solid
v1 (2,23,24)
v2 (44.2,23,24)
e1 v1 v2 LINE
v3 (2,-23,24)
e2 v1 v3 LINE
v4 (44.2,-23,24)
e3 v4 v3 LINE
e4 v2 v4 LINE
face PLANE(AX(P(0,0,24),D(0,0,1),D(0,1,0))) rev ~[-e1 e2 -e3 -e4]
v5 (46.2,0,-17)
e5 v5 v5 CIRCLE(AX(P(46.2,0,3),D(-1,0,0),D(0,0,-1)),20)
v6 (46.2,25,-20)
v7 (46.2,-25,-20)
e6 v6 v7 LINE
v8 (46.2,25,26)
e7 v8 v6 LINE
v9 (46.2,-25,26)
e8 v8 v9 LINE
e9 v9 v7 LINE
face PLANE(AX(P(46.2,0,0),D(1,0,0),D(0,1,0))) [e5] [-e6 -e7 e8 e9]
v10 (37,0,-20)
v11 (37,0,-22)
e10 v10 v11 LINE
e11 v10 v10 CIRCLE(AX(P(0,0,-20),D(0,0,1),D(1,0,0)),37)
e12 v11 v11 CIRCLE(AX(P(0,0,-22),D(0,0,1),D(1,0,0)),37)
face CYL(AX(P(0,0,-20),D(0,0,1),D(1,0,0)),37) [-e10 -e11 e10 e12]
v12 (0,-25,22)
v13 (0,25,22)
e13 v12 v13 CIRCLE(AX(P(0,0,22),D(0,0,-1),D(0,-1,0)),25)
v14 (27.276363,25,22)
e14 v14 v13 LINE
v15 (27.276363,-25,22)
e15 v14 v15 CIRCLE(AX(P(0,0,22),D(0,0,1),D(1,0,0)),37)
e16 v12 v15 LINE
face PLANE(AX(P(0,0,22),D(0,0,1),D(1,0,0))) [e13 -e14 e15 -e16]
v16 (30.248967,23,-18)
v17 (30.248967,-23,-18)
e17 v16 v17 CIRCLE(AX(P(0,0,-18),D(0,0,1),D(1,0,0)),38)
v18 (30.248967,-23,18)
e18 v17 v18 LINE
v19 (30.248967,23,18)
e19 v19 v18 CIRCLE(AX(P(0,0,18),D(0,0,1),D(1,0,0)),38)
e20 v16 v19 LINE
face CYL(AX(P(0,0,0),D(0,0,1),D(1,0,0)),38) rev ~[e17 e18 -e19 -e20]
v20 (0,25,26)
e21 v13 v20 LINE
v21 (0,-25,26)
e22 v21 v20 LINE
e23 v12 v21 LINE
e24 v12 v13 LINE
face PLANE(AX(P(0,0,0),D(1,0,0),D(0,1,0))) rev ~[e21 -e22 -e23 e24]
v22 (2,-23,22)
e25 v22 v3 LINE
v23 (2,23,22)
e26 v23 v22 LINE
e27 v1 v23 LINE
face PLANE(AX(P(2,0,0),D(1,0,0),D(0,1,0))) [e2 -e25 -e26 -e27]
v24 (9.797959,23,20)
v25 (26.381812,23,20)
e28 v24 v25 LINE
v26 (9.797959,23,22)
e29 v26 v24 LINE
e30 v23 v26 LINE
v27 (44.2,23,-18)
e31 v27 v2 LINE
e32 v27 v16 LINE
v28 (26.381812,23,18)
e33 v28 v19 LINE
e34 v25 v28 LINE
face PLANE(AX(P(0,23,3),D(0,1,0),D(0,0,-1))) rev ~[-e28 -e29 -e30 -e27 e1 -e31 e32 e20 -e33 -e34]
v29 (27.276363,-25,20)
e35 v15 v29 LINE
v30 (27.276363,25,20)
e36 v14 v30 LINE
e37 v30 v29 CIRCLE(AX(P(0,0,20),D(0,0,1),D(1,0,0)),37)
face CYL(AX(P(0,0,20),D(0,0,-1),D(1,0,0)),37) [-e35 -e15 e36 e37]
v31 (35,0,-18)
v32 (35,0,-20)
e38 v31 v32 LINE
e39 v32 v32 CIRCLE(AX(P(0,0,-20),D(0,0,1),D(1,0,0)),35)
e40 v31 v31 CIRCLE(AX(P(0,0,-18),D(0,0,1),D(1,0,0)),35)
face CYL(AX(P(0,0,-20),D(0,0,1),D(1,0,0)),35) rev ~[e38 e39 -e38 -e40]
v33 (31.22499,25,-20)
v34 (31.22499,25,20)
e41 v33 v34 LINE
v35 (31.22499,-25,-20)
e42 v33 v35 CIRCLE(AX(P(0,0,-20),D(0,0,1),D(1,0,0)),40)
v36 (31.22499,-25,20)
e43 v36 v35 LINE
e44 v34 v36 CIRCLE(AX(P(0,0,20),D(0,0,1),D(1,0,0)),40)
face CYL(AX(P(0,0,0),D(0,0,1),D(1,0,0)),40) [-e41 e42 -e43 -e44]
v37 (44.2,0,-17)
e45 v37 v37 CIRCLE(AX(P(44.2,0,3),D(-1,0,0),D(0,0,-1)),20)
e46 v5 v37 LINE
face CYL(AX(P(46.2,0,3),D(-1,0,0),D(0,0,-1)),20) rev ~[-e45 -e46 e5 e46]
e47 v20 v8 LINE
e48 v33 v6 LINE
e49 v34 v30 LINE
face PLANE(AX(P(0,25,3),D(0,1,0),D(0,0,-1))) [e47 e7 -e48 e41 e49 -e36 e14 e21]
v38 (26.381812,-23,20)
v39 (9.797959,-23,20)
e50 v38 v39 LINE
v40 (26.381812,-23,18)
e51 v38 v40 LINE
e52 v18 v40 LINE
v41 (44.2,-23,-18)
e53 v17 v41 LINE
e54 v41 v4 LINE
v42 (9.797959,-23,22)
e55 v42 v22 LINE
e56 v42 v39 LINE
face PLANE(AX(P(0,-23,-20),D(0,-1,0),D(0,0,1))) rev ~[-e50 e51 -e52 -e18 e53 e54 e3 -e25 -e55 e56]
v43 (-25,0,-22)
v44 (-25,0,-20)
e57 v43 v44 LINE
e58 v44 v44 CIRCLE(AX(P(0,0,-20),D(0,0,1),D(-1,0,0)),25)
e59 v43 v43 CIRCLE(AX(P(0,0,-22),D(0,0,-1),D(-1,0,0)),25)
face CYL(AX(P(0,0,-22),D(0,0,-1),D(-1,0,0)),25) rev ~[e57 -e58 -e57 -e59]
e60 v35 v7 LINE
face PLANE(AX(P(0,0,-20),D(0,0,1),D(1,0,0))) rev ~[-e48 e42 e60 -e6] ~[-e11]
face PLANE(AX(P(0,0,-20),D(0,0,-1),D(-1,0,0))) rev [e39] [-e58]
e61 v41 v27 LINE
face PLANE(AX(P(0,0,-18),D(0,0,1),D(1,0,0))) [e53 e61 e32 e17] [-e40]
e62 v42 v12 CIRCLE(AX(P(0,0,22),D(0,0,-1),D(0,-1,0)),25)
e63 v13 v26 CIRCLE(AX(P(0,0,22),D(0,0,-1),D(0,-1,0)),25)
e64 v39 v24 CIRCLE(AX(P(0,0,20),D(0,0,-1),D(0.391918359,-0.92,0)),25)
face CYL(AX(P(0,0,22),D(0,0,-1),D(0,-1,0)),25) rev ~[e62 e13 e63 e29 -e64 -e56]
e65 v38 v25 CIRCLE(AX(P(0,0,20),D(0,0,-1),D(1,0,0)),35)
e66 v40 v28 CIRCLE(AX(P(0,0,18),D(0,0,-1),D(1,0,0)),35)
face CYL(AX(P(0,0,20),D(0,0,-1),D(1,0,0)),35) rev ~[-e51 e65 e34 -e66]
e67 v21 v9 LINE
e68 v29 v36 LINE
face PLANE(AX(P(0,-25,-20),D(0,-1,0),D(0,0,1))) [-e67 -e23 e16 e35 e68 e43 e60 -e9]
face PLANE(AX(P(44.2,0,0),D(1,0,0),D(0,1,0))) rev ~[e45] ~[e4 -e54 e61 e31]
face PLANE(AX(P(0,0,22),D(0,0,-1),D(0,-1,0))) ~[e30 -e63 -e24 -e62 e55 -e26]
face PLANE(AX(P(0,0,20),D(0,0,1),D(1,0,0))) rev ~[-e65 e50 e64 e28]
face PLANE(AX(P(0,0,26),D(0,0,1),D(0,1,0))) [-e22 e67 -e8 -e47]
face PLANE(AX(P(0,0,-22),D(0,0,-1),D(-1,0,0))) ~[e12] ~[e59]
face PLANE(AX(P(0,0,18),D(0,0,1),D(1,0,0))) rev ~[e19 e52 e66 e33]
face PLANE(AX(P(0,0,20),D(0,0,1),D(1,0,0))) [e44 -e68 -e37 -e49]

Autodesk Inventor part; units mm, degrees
ref_plane "YZ Plane" through (0, 0, 0) normal (1, 0, 0) x (0, 1, 0)
ref_plane "XZ Plane" through (0, 0, 0) normal (0, 1, 0) x (-1, 0, 0)
sketch "ｽｹｯﾁ1" plane through (0, 0, 0) normal (0, 0, 1) x (1, 0, 0)
  circle A0 centre (0, 0) radius 40
  dimension "d0" = 80
extrude "押し出し1" add sketch "ｽｹｯﾁ1" along normal mid plane 40
sketch "ｽｹｯﾁ2" plane through (0, 0, 20) normal (0, 0, 1) x (1, 0, 0)
  circle A0 centre (0, 0) radius 40 projected
  circle A1 centre (0, 0) radius 37
  dimension "d3" = 3
extrude "押し出し2" add sketch "ｽｹｯﾁ2" along normal blind 2 contours A1
mirror "Mirror1" about plane through (0, 0, 0) normal (0, 0, 1) of "押し出し2"
ref_plane "作業平面1" through (0, 0, 0) normal (1, 0, 0) x (0, 1, 0)
sketch "ｽｹｯﾁ3" plane through (0, 0, 0) normal (1, 0, 0) x (0, 1, 0)
  line L0 (-37, -22) -> (37, -22) projected
  line L1 (40, -20) -> (-40, -20) projected
  line L2 (-25, 26) -> (25, 26)
  line L3 (25, 26) -> (25, -20)
  line L4 (25, -20) -> (-25, -20)
  line L5 (-25, -20) -> (-25, 26)
  line L6 (-25, 3) -> (25, 3)
  line L7 (0, 26) -> (0, -20)
  line L8 (0, -20) -> (0, 24.715)
  dimension "d6" = 50
  dimension "d7" = 46
  dimension "d8" = 25
extrude "押し出し3" add sketch "ｽｹｯﾁ3" along normal blind 46.2
sketch "Sketch4" plane through (46.2, 0, 0) normal (1, 0, 0) x (0, 0, -1)
  point P0 (0, 0)
ref_plane "Work Plane2" through (46.2, 0, -20) normal (0, -1, 0) x (1, 0, 0)
ref_plane "Work Plane3" through (46.2, 25, 3) normal (0, 0, -1) x (-1, 0, 0)
shell "Shell1" thickness 2 removed faces 0
sketch "Sketch7" plane through (0, 0, 22) normal (0, 0, 1) x (1, 0, 0)
  circle A0 centre (0, 0) radius 37 projected
hole "Hole1" at (0, 0, 22) direction (0, 0, -1) diameter 50 end through all
sketch "Sketch8" plane through (46.2, 0, 0) normal (1, 0, 0) x (0, 0, -1)
  point P0 (-3, 0)
hole "Hole2" at (46.2, 0, 3) direction (-1, 0, 0) diameter 40 depth 2 tip angle 118
sketch "Sketch9" plane through (0, 0, -22) normal (0, 0, -1) x (-1, 0, 0)
  circle A0 centre (0, 0) radius 25
extrude "Extrusion7" add sketch "Sketch9" against normal blind 10
sketch "Sketch10" plane through (0, 0, -22) normal (0, 0, -1) x (-1, 0, 0)
  circle A0 centre (0, 0) radius 25 projected
  circle A1 centre (0, 0) radius 25
extrude "Extrusion8" cut sketch "Sketch10" against normal blind 10
properties part number "Robot-Axis5"
